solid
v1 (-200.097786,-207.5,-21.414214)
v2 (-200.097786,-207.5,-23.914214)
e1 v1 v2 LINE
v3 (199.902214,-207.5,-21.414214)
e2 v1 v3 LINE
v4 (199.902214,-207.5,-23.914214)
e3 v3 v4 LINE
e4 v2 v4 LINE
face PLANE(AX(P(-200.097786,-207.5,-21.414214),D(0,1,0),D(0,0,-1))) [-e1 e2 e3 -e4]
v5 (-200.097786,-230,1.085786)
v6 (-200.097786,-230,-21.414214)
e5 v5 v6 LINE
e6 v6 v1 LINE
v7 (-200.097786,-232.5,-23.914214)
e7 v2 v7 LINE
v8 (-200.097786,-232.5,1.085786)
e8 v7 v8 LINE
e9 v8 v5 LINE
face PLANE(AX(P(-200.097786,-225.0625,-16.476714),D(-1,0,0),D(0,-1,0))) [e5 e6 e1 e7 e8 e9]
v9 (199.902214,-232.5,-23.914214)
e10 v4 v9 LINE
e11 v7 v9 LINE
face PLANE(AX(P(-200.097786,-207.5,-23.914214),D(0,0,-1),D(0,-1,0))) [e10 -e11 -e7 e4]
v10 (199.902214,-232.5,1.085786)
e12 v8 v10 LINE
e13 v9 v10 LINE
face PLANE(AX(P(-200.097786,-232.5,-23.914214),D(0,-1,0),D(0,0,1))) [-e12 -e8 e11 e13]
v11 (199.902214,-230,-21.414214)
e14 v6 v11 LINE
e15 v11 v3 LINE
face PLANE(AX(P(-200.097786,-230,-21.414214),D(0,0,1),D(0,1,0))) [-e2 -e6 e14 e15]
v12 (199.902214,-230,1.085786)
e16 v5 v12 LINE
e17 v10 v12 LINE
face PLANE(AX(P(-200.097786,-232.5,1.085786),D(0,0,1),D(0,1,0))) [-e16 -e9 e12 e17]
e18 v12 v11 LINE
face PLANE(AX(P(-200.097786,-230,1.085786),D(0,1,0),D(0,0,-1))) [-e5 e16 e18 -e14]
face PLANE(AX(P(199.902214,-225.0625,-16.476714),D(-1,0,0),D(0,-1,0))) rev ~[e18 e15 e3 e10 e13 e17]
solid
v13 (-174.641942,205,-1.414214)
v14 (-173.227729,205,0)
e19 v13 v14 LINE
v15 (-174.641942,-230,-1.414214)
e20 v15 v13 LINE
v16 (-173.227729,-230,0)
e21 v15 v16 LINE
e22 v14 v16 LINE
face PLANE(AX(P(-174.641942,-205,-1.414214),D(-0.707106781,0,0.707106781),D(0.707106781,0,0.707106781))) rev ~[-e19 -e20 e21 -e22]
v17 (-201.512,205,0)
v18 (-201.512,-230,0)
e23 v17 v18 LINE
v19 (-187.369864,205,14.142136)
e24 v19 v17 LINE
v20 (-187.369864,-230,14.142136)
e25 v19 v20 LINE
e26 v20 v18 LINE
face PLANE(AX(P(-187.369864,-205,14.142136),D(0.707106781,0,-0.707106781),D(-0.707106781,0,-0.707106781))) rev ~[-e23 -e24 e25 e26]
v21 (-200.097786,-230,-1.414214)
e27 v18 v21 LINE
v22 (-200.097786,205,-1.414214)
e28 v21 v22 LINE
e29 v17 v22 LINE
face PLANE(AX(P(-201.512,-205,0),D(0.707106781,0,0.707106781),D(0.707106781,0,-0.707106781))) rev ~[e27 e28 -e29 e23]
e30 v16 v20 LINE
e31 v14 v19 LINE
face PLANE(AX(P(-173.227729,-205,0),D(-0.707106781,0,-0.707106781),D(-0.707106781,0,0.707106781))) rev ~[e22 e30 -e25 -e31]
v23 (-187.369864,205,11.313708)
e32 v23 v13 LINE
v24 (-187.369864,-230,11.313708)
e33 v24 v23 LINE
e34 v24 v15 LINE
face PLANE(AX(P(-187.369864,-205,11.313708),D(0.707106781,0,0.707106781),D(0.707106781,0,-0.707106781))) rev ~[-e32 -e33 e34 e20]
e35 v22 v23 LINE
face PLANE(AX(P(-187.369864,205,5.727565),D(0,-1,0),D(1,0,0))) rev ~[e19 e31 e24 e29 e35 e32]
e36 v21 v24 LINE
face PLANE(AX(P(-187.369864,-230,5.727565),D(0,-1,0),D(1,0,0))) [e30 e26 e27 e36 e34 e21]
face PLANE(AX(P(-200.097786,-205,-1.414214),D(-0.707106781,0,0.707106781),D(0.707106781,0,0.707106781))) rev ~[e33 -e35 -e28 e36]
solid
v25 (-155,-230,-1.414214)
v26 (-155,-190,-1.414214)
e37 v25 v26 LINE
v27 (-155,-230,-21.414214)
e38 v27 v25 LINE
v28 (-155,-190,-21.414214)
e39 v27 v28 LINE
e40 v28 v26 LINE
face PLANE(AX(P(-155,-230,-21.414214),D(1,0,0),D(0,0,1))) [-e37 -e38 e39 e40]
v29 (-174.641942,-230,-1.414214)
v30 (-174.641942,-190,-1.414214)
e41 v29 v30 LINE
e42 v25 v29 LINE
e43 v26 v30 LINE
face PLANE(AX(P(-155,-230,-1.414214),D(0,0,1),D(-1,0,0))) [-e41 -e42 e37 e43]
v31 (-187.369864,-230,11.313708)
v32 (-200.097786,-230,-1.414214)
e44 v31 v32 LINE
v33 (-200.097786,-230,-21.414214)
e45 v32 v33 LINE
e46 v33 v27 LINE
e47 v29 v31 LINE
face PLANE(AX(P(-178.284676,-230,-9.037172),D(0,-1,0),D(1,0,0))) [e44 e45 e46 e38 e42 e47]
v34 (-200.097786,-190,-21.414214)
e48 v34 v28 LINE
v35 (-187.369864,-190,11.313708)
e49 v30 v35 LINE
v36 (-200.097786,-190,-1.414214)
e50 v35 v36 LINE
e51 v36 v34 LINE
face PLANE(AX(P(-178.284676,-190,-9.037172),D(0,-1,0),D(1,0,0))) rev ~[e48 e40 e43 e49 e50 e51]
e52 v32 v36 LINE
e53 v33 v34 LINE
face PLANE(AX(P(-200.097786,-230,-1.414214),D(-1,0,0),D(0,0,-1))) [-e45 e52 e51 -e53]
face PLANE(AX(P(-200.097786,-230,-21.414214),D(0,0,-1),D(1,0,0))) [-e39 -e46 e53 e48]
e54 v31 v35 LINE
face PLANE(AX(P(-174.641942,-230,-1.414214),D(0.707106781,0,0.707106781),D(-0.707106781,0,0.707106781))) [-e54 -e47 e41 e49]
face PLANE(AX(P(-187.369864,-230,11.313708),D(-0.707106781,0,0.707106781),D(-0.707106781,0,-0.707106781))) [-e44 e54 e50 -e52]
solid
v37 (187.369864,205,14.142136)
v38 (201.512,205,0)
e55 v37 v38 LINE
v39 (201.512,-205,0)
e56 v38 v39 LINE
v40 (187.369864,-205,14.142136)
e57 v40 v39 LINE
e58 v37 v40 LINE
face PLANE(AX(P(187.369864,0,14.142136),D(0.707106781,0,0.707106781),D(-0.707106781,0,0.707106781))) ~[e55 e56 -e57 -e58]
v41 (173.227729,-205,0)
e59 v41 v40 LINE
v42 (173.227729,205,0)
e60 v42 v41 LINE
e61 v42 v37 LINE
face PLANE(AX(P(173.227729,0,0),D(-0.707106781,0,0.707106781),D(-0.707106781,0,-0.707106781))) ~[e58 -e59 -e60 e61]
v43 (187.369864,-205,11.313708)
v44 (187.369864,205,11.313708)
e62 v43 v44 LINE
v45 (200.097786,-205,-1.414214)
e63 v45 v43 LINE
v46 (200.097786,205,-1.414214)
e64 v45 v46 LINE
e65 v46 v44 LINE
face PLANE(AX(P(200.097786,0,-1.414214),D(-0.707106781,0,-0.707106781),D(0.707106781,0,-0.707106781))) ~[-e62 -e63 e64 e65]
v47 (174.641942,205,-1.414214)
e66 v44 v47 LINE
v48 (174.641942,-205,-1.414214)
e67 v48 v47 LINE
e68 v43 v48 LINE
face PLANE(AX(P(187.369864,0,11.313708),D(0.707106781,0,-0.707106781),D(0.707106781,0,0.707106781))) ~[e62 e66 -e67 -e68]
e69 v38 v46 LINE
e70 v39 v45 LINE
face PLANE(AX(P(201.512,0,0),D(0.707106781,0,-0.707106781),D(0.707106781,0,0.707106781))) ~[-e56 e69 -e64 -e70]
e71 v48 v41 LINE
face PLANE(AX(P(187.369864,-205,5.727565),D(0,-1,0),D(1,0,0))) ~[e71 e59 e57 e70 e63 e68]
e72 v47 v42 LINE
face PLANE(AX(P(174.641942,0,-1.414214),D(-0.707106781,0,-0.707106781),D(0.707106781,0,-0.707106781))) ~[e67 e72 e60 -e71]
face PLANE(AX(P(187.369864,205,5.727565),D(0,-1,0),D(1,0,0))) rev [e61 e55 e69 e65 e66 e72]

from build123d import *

# Parameters (mm, degrees)
F1_DEPTH = 205
F2_DEPTH = 25
F4_DEPTH = 40
F6_DEPTH = 400


# Not quite as in the source:
# - a pattern or mirror of a feature is missing from the dataset's text; its kind, count and spacing are read off the source's solid


with BuildPart() as f1:
    # F0 (on Front) → F1 (new body, symmetric)
    with BuildSketch(Plane.XZ):
        Polygon((-174.6419423149, -1.4142135624), (-173.2277287525, 0), (-187.3698643763, 14.1421356237), (-201.512, 0), (-200.0977864376, -1.4142135624), (-187.3698643763, 11.313708499), align=None)
    extrude(amount=F1_DEPTH, both=True)


with BuildPart() as f1_copies_1:
    # F1_copies: instance of F1
    add(f1.part.mirror(Plane(origin=(0, 0, 0), x_dir=(0, 0, 1), z_dir=(1, 0, 0))))


with BuildPart() as f1_1:
    add(f1.part)

    # F2 (add): a face of the model
    f2_faces = [f1_1.faces().sort_by_distance(p)[0] for p in [
        (-174.1630897779, -205, -0.478852537),
    ]]
    extrude(f2_faces, amount=F2_DEPTH)


with BuildPart() as f4:
    # F3 (on face) → F4 (new body)
    with BuildSketch(Plane.XZ.offset(230)):
        Polygon((-174.6419423149, -1.4142135624), (-187.3698643763, 11.313708499), (-200.0977864376, -1.4142135624), (-200.0977864376, -21.4142135624), (-155, -21.4142135624), (-155, -1.4142135624), align=None)
    extrude(amount=-F4_DEPTH)


with BuildPart() as f6:
    # F5 (on face) → F6 (new body)
    with BuildSketch(Plane(origin=(-200.0977864376, 0, 0), x_dir=(0, -1, 0), z_dir=(-1, 0, 0))):
        Polygon((230, 1.0857864376), (230, -21.4142135624), (207.5, -21.4142135624), (207.5, -23.9142135624), (232.5, -23.9142135624), (232.5, 1.0857864376), align=None)
    extrude(amount=-F6_DEPTH)


solid = Compound([f1_copies_1.part, f1_1.part, f4.part, f6.part])
